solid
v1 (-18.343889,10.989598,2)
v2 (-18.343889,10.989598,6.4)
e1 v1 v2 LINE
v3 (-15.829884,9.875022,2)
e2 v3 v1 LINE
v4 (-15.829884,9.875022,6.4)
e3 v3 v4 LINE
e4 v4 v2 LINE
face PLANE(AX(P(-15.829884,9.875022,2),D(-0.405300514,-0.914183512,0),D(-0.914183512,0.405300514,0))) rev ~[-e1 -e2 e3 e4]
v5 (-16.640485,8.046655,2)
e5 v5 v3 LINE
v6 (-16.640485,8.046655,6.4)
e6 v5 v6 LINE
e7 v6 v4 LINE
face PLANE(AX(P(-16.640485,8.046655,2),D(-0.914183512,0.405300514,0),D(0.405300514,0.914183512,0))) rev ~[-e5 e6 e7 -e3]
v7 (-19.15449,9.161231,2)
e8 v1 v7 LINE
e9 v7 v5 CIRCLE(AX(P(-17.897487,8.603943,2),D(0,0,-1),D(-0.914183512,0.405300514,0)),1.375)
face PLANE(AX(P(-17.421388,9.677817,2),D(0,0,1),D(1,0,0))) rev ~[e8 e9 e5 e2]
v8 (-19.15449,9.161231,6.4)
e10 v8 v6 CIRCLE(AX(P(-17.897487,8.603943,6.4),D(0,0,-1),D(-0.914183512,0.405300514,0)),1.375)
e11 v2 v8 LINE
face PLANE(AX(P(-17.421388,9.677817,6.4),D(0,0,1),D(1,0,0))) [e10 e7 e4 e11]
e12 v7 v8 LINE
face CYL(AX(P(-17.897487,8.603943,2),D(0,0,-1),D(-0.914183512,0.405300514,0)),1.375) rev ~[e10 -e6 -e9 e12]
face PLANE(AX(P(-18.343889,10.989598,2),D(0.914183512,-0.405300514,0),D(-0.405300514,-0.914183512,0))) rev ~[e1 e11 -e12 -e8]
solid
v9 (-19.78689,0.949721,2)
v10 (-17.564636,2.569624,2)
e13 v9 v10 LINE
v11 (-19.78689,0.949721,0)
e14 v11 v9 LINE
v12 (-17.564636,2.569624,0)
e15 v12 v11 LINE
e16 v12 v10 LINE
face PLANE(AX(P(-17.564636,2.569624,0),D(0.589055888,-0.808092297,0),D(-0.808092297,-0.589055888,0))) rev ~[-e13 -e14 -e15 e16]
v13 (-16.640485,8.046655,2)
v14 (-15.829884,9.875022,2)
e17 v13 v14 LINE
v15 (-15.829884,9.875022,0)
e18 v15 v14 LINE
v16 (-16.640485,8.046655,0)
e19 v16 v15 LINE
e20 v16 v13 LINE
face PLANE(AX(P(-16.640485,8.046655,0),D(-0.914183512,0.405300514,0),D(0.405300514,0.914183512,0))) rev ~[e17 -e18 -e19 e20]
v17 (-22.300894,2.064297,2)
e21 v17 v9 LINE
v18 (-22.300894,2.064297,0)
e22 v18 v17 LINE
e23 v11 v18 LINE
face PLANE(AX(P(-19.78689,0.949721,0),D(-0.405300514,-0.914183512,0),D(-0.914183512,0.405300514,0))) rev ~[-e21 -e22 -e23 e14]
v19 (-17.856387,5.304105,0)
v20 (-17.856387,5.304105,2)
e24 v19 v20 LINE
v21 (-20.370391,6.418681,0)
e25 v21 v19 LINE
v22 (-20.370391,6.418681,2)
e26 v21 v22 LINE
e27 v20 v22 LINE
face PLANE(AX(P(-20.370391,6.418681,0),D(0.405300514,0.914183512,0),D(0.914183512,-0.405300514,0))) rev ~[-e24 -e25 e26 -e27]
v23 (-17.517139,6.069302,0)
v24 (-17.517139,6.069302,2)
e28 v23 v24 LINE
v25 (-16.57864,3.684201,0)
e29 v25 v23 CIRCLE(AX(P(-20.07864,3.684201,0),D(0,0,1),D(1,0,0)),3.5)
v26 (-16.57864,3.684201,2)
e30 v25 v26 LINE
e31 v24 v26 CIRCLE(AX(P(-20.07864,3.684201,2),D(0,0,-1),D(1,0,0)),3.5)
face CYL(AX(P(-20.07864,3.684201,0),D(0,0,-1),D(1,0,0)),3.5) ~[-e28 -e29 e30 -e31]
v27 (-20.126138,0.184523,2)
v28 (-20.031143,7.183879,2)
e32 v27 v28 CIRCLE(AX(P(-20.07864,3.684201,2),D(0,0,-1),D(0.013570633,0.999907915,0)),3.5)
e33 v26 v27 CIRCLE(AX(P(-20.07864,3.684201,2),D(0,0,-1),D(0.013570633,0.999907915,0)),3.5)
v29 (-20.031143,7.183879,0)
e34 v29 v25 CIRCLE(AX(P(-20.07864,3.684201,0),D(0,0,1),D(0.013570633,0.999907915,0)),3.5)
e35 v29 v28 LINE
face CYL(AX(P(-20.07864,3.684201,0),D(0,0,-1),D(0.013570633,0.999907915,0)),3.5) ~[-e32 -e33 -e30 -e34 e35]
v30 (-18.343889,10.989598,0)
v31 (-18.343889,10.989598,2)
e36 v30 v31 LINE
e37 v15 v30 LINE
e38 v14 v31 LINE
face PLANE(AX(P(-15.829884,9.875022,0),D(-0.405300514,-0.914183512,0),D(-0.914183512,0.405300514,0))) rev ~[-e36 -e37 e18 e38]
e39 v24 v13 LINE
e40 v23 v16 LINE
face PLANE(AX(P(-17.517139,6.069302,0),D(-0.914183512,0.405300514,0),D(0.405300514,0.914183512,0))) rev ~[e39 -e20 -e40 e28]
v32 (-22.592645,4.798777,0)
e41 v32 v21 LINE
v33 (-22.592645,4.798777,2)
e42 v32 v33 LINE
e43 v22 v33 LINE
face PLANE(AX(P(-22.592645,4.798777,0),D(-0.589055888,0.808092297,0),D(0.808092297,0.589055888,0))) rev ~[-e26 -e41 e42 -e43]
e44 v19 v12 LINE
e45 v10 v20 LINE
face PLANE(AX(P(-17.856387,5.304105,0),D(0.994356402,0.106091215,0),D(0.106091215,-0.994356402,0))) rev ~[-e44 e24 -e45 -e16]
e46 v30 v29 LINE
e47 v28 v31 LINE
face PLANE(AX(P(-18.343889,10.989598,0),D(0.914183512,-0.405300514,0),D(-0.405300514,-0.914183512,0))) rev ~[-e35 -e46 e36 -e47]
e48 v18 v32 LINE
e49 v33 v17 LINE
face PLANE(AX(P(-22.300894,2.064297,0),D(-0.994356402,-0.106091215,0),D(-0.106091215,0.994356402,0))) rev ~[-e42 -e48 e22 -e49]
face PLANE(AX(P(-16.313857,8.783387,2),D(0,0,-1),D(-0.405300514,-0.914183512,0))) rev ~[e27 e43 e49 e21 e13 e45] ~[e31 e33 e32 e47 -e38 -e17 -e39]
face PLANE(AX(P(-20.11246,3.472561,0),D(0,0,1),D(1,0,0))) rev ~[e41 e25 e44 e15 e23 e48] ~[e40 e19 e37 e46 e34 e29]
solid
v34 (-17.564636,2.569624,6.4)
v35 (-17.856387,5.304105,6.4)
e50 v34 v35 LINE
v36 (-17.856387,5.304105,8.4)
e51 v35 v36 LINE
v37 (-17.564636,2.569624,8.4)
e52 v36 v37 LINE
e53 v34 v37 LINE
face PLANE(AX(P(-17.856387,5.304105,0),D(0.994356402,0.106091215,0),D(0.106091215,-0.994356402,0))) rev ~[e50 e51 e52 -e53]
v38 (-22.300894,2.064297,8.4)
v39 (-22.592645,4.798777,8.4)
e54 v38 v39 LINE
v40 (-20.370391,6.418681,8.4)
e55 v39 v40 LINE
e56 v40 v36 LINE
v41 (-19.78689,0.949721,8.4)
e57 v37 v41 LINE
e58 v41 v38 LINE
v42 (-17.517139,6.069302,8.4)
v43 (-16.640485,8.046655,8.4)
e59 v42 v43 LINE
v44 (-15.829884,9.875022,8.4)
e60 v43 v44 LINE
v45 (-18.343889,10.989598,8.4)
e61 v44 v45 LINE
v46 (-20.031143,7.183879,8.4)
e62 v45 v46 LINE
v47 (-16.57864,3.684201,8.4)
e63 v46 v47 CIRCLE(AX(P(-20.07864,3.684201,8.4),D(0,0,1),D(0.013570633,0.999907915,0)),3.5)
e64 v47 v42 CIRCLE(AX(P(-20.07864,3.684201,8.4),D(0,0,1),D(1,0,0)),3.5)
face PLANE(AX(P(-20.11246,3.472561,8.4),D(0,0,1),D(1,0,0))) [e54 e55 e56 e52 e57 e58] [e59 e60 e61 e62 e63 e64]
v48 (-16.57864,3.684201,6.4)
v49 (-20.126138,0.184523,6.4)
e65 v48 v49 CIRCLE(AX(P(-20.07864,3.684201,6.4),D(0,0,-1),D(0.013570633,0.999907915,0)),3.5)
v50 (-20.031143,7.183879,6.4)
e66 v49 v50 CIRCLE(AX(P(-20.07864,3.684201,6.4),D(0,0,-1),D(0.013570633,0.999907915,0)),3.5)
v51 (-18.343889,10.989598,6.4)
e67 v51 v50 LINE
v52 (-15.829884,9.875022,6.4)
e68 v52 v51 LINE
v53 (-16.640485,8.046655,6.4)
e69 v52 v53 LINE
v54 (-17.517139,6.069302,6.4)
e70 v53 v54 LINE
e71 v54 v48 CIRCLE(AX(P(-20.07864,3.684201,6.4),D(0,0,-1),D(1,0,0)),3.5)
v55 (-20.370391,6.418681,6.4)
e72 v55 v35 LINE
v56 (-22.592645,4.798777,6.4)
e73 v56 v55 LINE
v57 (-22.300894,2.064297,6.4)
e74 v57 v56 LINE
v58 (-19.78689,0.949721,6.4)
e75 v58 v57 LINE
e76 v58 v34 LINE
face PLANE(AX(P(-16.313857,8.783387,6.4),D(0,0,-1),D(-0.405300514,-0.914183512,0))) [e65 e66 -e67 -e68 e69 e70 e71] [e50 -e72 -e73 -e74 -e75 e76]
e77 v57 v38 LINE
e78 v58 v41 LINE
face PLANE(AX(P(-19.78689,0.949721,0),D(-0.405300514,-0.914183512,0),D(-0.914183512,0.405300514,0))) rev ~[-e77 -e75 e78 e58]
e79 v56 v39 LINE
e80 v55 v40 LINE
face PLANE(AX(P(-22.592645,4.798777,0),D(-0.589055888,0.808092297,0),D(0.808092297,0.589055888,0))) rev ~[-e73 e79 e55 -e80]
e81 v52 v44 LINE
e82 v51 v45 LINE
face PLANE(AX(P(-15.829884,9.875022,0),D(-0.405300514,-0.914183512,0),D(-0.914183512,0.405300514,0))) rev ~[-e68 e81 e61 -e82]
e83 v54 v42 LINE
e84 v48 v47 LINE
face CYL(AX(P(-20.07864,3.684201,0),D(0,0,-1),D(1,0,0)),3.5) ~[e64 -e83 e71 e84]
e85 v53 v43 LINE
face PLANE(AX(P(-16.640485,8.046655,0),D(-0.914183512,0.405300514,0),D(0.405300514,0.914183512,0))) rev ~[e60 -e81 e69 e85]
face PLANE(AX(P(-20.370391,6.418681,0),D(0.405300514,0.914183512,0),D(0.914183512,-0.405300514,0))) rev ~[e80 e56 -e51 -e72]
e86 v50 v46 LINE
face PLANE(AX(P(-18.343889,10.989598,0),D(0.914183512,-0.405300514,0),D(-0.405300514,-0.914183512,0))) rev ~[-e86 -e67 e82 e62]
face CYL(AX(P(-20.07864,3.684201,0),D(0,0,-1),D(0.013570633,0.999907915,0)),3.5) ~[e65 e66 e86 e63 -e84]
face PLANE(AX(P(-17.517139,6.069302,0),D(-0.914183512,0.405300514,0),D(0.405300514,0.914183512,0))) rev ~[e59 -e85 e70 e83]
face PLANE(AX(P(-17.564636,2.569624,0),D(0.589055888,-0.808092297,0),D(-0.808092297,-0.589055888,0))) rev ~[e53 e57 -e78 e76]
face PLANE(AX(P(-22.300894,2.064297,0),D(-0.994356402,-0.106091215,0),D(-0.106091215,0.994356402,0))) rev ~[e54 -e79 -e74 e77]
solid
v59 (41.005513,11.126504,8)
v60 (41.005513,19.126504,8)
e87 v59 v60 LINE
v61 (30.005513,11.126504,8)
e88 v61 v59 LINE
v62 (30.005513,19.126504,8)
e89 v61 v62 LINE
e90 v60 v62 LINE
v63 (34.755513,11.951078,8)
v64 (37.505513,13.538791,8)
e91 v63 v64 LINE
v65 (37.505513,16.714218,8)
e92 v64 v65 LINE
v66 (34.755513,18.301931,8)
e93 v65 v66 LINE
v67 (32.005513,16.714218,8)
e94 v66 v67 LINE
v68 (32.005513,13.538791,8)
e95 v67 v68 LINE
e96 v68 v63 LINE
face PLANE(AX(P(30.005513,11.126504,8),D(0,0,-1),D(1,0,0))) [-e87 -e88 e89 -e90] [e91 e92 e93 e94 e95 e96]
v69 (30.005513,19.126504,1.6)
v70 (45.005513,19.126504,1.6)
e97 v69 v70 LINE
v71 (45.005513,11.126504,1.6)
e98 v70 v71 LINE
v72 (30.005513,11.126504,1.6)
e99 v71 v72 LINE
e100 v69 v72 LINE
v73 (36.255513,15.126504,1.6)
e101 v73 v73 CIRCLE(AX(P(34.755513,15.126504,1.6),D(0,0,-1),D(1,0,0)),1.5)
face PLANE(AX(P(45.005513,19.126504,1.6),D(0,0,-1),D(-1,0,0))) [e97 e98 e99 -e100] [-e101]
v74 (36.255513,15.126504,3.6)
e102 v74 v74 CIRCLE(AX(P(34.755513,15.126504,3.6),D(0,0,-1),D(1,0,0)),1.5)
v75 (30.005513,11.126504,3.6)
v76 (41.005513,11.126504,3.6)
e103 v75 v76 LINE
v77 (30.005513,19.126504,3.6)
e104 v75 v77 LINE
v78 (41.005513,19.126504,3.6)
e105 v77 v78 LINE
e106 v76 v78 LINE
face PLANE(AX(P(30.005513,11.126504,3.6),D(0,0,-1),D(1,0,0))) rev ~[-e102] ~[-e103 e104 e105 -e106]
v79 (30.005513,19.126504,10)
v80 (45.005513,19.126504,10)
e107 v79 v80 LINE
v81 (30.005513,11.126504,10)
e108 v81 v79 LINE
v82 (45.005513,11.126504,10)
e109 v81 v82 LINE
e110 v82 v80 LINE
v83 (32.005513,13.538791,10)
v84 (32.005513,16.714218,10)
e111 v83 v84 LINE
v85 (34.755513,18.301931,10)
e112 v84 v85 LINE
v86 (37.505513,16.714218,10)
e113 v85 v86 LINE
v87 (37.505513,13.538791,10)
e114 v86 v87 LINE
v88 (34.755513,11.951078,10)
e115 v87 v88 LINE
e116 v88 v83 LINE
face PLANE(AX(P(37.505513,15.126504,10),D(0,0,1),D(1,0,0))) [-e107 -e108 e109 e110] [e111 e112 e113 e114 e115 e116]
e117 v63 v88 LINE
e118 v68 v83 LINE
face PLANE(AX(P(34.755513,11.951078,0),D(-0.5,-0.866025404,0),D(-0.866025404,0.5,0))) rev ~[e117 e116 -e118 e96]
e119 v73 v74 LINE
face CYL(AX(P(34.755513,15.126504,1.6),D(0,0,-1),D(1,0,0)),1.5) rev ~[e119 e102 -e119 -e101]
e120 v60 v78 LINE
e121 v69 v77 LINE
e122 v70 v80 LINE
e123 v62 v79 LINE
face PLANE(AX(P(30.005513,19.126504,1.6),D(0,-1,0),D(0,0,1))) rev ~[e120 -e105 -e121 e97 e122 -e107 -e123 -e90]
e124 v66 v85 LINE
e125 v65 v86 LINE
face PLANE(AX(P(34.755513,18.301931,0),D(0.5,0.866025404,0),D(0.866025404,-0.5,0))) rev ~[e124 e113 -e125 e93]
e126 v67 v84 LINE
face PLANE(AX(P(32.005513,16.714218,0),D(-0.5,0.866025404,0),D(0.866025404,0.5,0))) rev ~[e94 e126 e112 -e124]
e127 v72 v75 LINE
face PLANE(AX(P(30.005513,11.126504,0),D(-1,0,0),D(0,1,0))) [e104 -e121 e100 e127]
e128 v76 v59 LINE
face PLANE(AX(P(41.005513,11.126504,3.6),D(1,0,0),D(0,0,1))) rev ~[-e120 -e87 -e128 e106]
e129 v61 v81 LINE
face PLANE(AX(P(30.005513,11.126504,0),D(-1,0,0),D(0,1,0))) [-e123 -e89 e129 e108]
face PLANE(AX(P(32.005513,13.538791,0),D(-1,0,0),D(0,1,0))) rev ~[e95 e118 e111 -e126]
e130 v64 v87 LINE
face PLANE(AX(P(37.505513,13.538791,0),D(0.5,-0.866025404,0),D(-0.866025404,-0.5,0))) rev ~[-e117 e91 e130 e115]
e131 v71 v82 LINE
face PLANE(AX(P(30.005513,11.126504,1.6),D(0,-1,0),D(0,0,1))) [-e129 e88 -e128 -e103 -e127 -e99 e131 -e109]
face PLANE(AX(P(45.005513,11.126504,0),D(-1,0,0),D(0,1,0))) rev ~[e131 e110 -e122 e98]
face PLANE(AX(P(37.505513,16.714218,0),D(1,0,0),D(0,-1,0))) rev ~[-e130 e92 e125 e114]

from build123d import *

# Parameters (mm, degrees)
F1_DEPTH  = 8.4
F3_DEPTH  = 25
F4_W      = 9.4060590708
F4_H      = 4.4
F5_DEPTH  = 25
F7_DEPTH  = 4.4
F8_W      = 15
F8_H      = 8
F9_DEPTH  = 10
F10_W     = 11
F10_H     = 4.4
F11_DEPTH = 25
F12_W     = 15
F12_H     = 1.6
F13_DEPTH = 25
F14_DEPTH = 10
F15_R     = 1.5
F16_DEPTH = 25


# Not quite as in the source:
# - a feature names something its author has since deleted; it is built from what else it names


with BuildPart() as f1:
    # F0 (on Top) → F1 (new body)
    with BuildSketch(Plane.XY):
        with BuildLine():
            Line((-17.517138558, 6.0693021001), (-17.8563866138, 5.3041045041))
            Line((-17.8563866138, 5.3041045041), (-17.5646357736, 2.5696243986))
            Line((-17.5646357736, 2.5696243986), (-19.786889591, 0.9497207067))
            Line((-19.786889591, 0.9497207067), (-22.3008942486, 2.0642971202))
            Line((-22.3008942486, 2.0642971202), (-22.5926450887, 4.7987772257))
            Line((-22.5926450887, 4.7987772257), (-20.3703912714, 6.4186809176))
            Line((-20.3703912714, 6.4186809176), (-20.0311432156, 7.1838785137))
            ThreePointArc((-20.0311432156, 7.1838785137), (-22.570250378, 1.2261772417), (-16.5786404312, 3.6842008121))
            ThreePointArc((-16.5786404312, 3.6842008121), (-16.8217050192, 4.9657513269), (-17.517138558, 6.0693021001))
        make_face()
        with BuildLine():
            Line((-20.3703912714, 6.4186809176), (-17.8563866138, 5.3041045041))
            Line((-17.8563866138, 5.3041045041), (-17.517138558, 6.0693021001))
            ThreePointArc((-17.517138558, 6.0693021001), (-18.6600886321, 6.8838431036), (-20.0311432156, 7.1838785137))
            Line((-20.0311432156, 7.1838785137), (-20.3703912714, 6.4186809176))
        make_face()
        with BuildLine():
            ThreePointArc((-20.0311432156, 7.1838785137), (-18.6600886321, 6.8838431036), (-17.517138558, 6.0693021001))
            Line((-17.517138558, 6.0693021001), (-16.6404850717, 8.0466550396))
            ThreePointArc((-16.6404850717, 8.0466550396), (-17.3401991937, 9.8609455752), (-19.1544897293, 9.1612314532))
            Line((-19.1544897293, 9.1612314532), (-20.0311432156, 7.1838785137))
        make_face()
        with BuildLine():
            ThreePointArc((-19.1544897293, 9.1612314532), (-17.3401991937, 9.8609455752), (-16.6404850717, 8.0466550396))
            Line((-16.6404850717, 8.0466550396), (-15.8298840437, 9.8750220633))
            Line((-15.8298840437, 9.8750220633), (-18.3438887013, 10.9895984768))
            Line((-18.3438887013, 10.9895984768), (-19.1544897293, 9.1612314532))
        make_face()
    extrude(amount=F1_DEPTH)

    # F2 (on face) → F3 (cut)
    with BuildSketch(Plane(origin=(-16.8884163977, 7.4874286817, 0), x_dir=(0.405300514, 0.9141835118, 0), z_dir=(0.9141835118, -0.405300514, 0))):
        Polygon((-1.5512493534, 2), (2.6117222096, 2), (2.6117222096, 6.4), (-1.5512493534, 6.4), (-9.2430952936, 6.4), (-9.2430952936, 2), align=None)
    extrude(amount=-F3_DEPTH, mode=Mode.SUBTRACT)

    # F4 (on face) → F5 (cut)
    with BuildSketch(Plane(origin=(-16.8884163977, 7.4874286817, 0), x_dir=(-0.405300514, -0.9141835118, 0), z_dir=(-0.9141835118, 0.405300514, 0))):
        with Locations((3.2854164128, 4.2)):
            Rectangle(F4_W, F4_H)
    extrude(amount=-F5_DEPTH, mode=Mode.SUBTRACT)


with BuildPart() as f7:
    # F6 (on face) → F7 (new body)
    with BuildSketch(Plane.XY.offset(2)):
        with BuildLine():
            Line((-18.3438887013, 10.9895984768), (-19.1544897293, 9.1612314532))
            ThreePointArc((-19.1544897293, 9.1612314532), (-17.3401991937, 9.8609455752), (-16.6404850717, 8.0466550396))
            Line((-16.6404850717, 8.0466550396), (-15.8298840437, 9.8750220633))
            Line((-15.8298840437, 9.8750220633), (-18.3438887013, 10.9895984768))
        make_face()
    extrude(amount=F7_DEPTH)


with BuildPart() as f9:
    # F8 (on Top) → F9 (new body)
    with BuildSketch(Plane.XY):
        with Locations((37.5055125356, 15.1265042797)):
            Rectangle(F8_W, F8_H)
        Polygon((32.0055125356, 13.5387910394), (32.0055125356, 16.7142175199), (34.7555125356, 18.3019307602), (37.5055125356, 16.7142175199), (37.5055125356, 13.5387910394), (34.7555125356, 11.9510777991), align=None, mode=Mode.SUBTRACT)
    extrude(amount=F9_DEPTH)

    # F10 (on face) → F11 (cut)
    with BuildSketch(Plane.XZ.offset(-11.1265042797)):
        with Locations((35.5055125356, 5.8)):
            Rectangle(F10_W, F10_H)
    extrude(amount=-F11_DEPTH, mode=Mode.SUBTRACT)

    # F12 (on face) → F13 (cut)
    with BuildSketch(Plane(origin=(0, 19.1265042797, 0), x_dir=(-1, 0, 0), z_dir=(0, 1, 0))):
        with Locations((-37.5055125356, 0.8)):
            Rectangle(F12_W, F12_H)
    extrude(amount=-F13_DEPTH, mode=Mode.SUBTRACT)

    # F14 (add): a face of the model
    f14_faces = [f9.faces().sort_by_distance(p)[0] for p in [
        (30.0055125356, 15.1265042797, 2.6),
    ]]
    extrude(f14_faces, amount=-F14_DEPTH)

    # F15 (on face) → F16 (cut)
    with BuildSketch(Plane(origin=(0, 0, 1.6), x_dir=(1, 0, 0), z_dir=(0, 0, -1))):
        with Locations((34.7555125356, -15.1265042797)):
            Circle(F15_R)
    extrude(amount=-F16_DEPTH, mode=Mode.SUBTRACT)


solid = Compound([f1.part, f7.part, f9.part])
